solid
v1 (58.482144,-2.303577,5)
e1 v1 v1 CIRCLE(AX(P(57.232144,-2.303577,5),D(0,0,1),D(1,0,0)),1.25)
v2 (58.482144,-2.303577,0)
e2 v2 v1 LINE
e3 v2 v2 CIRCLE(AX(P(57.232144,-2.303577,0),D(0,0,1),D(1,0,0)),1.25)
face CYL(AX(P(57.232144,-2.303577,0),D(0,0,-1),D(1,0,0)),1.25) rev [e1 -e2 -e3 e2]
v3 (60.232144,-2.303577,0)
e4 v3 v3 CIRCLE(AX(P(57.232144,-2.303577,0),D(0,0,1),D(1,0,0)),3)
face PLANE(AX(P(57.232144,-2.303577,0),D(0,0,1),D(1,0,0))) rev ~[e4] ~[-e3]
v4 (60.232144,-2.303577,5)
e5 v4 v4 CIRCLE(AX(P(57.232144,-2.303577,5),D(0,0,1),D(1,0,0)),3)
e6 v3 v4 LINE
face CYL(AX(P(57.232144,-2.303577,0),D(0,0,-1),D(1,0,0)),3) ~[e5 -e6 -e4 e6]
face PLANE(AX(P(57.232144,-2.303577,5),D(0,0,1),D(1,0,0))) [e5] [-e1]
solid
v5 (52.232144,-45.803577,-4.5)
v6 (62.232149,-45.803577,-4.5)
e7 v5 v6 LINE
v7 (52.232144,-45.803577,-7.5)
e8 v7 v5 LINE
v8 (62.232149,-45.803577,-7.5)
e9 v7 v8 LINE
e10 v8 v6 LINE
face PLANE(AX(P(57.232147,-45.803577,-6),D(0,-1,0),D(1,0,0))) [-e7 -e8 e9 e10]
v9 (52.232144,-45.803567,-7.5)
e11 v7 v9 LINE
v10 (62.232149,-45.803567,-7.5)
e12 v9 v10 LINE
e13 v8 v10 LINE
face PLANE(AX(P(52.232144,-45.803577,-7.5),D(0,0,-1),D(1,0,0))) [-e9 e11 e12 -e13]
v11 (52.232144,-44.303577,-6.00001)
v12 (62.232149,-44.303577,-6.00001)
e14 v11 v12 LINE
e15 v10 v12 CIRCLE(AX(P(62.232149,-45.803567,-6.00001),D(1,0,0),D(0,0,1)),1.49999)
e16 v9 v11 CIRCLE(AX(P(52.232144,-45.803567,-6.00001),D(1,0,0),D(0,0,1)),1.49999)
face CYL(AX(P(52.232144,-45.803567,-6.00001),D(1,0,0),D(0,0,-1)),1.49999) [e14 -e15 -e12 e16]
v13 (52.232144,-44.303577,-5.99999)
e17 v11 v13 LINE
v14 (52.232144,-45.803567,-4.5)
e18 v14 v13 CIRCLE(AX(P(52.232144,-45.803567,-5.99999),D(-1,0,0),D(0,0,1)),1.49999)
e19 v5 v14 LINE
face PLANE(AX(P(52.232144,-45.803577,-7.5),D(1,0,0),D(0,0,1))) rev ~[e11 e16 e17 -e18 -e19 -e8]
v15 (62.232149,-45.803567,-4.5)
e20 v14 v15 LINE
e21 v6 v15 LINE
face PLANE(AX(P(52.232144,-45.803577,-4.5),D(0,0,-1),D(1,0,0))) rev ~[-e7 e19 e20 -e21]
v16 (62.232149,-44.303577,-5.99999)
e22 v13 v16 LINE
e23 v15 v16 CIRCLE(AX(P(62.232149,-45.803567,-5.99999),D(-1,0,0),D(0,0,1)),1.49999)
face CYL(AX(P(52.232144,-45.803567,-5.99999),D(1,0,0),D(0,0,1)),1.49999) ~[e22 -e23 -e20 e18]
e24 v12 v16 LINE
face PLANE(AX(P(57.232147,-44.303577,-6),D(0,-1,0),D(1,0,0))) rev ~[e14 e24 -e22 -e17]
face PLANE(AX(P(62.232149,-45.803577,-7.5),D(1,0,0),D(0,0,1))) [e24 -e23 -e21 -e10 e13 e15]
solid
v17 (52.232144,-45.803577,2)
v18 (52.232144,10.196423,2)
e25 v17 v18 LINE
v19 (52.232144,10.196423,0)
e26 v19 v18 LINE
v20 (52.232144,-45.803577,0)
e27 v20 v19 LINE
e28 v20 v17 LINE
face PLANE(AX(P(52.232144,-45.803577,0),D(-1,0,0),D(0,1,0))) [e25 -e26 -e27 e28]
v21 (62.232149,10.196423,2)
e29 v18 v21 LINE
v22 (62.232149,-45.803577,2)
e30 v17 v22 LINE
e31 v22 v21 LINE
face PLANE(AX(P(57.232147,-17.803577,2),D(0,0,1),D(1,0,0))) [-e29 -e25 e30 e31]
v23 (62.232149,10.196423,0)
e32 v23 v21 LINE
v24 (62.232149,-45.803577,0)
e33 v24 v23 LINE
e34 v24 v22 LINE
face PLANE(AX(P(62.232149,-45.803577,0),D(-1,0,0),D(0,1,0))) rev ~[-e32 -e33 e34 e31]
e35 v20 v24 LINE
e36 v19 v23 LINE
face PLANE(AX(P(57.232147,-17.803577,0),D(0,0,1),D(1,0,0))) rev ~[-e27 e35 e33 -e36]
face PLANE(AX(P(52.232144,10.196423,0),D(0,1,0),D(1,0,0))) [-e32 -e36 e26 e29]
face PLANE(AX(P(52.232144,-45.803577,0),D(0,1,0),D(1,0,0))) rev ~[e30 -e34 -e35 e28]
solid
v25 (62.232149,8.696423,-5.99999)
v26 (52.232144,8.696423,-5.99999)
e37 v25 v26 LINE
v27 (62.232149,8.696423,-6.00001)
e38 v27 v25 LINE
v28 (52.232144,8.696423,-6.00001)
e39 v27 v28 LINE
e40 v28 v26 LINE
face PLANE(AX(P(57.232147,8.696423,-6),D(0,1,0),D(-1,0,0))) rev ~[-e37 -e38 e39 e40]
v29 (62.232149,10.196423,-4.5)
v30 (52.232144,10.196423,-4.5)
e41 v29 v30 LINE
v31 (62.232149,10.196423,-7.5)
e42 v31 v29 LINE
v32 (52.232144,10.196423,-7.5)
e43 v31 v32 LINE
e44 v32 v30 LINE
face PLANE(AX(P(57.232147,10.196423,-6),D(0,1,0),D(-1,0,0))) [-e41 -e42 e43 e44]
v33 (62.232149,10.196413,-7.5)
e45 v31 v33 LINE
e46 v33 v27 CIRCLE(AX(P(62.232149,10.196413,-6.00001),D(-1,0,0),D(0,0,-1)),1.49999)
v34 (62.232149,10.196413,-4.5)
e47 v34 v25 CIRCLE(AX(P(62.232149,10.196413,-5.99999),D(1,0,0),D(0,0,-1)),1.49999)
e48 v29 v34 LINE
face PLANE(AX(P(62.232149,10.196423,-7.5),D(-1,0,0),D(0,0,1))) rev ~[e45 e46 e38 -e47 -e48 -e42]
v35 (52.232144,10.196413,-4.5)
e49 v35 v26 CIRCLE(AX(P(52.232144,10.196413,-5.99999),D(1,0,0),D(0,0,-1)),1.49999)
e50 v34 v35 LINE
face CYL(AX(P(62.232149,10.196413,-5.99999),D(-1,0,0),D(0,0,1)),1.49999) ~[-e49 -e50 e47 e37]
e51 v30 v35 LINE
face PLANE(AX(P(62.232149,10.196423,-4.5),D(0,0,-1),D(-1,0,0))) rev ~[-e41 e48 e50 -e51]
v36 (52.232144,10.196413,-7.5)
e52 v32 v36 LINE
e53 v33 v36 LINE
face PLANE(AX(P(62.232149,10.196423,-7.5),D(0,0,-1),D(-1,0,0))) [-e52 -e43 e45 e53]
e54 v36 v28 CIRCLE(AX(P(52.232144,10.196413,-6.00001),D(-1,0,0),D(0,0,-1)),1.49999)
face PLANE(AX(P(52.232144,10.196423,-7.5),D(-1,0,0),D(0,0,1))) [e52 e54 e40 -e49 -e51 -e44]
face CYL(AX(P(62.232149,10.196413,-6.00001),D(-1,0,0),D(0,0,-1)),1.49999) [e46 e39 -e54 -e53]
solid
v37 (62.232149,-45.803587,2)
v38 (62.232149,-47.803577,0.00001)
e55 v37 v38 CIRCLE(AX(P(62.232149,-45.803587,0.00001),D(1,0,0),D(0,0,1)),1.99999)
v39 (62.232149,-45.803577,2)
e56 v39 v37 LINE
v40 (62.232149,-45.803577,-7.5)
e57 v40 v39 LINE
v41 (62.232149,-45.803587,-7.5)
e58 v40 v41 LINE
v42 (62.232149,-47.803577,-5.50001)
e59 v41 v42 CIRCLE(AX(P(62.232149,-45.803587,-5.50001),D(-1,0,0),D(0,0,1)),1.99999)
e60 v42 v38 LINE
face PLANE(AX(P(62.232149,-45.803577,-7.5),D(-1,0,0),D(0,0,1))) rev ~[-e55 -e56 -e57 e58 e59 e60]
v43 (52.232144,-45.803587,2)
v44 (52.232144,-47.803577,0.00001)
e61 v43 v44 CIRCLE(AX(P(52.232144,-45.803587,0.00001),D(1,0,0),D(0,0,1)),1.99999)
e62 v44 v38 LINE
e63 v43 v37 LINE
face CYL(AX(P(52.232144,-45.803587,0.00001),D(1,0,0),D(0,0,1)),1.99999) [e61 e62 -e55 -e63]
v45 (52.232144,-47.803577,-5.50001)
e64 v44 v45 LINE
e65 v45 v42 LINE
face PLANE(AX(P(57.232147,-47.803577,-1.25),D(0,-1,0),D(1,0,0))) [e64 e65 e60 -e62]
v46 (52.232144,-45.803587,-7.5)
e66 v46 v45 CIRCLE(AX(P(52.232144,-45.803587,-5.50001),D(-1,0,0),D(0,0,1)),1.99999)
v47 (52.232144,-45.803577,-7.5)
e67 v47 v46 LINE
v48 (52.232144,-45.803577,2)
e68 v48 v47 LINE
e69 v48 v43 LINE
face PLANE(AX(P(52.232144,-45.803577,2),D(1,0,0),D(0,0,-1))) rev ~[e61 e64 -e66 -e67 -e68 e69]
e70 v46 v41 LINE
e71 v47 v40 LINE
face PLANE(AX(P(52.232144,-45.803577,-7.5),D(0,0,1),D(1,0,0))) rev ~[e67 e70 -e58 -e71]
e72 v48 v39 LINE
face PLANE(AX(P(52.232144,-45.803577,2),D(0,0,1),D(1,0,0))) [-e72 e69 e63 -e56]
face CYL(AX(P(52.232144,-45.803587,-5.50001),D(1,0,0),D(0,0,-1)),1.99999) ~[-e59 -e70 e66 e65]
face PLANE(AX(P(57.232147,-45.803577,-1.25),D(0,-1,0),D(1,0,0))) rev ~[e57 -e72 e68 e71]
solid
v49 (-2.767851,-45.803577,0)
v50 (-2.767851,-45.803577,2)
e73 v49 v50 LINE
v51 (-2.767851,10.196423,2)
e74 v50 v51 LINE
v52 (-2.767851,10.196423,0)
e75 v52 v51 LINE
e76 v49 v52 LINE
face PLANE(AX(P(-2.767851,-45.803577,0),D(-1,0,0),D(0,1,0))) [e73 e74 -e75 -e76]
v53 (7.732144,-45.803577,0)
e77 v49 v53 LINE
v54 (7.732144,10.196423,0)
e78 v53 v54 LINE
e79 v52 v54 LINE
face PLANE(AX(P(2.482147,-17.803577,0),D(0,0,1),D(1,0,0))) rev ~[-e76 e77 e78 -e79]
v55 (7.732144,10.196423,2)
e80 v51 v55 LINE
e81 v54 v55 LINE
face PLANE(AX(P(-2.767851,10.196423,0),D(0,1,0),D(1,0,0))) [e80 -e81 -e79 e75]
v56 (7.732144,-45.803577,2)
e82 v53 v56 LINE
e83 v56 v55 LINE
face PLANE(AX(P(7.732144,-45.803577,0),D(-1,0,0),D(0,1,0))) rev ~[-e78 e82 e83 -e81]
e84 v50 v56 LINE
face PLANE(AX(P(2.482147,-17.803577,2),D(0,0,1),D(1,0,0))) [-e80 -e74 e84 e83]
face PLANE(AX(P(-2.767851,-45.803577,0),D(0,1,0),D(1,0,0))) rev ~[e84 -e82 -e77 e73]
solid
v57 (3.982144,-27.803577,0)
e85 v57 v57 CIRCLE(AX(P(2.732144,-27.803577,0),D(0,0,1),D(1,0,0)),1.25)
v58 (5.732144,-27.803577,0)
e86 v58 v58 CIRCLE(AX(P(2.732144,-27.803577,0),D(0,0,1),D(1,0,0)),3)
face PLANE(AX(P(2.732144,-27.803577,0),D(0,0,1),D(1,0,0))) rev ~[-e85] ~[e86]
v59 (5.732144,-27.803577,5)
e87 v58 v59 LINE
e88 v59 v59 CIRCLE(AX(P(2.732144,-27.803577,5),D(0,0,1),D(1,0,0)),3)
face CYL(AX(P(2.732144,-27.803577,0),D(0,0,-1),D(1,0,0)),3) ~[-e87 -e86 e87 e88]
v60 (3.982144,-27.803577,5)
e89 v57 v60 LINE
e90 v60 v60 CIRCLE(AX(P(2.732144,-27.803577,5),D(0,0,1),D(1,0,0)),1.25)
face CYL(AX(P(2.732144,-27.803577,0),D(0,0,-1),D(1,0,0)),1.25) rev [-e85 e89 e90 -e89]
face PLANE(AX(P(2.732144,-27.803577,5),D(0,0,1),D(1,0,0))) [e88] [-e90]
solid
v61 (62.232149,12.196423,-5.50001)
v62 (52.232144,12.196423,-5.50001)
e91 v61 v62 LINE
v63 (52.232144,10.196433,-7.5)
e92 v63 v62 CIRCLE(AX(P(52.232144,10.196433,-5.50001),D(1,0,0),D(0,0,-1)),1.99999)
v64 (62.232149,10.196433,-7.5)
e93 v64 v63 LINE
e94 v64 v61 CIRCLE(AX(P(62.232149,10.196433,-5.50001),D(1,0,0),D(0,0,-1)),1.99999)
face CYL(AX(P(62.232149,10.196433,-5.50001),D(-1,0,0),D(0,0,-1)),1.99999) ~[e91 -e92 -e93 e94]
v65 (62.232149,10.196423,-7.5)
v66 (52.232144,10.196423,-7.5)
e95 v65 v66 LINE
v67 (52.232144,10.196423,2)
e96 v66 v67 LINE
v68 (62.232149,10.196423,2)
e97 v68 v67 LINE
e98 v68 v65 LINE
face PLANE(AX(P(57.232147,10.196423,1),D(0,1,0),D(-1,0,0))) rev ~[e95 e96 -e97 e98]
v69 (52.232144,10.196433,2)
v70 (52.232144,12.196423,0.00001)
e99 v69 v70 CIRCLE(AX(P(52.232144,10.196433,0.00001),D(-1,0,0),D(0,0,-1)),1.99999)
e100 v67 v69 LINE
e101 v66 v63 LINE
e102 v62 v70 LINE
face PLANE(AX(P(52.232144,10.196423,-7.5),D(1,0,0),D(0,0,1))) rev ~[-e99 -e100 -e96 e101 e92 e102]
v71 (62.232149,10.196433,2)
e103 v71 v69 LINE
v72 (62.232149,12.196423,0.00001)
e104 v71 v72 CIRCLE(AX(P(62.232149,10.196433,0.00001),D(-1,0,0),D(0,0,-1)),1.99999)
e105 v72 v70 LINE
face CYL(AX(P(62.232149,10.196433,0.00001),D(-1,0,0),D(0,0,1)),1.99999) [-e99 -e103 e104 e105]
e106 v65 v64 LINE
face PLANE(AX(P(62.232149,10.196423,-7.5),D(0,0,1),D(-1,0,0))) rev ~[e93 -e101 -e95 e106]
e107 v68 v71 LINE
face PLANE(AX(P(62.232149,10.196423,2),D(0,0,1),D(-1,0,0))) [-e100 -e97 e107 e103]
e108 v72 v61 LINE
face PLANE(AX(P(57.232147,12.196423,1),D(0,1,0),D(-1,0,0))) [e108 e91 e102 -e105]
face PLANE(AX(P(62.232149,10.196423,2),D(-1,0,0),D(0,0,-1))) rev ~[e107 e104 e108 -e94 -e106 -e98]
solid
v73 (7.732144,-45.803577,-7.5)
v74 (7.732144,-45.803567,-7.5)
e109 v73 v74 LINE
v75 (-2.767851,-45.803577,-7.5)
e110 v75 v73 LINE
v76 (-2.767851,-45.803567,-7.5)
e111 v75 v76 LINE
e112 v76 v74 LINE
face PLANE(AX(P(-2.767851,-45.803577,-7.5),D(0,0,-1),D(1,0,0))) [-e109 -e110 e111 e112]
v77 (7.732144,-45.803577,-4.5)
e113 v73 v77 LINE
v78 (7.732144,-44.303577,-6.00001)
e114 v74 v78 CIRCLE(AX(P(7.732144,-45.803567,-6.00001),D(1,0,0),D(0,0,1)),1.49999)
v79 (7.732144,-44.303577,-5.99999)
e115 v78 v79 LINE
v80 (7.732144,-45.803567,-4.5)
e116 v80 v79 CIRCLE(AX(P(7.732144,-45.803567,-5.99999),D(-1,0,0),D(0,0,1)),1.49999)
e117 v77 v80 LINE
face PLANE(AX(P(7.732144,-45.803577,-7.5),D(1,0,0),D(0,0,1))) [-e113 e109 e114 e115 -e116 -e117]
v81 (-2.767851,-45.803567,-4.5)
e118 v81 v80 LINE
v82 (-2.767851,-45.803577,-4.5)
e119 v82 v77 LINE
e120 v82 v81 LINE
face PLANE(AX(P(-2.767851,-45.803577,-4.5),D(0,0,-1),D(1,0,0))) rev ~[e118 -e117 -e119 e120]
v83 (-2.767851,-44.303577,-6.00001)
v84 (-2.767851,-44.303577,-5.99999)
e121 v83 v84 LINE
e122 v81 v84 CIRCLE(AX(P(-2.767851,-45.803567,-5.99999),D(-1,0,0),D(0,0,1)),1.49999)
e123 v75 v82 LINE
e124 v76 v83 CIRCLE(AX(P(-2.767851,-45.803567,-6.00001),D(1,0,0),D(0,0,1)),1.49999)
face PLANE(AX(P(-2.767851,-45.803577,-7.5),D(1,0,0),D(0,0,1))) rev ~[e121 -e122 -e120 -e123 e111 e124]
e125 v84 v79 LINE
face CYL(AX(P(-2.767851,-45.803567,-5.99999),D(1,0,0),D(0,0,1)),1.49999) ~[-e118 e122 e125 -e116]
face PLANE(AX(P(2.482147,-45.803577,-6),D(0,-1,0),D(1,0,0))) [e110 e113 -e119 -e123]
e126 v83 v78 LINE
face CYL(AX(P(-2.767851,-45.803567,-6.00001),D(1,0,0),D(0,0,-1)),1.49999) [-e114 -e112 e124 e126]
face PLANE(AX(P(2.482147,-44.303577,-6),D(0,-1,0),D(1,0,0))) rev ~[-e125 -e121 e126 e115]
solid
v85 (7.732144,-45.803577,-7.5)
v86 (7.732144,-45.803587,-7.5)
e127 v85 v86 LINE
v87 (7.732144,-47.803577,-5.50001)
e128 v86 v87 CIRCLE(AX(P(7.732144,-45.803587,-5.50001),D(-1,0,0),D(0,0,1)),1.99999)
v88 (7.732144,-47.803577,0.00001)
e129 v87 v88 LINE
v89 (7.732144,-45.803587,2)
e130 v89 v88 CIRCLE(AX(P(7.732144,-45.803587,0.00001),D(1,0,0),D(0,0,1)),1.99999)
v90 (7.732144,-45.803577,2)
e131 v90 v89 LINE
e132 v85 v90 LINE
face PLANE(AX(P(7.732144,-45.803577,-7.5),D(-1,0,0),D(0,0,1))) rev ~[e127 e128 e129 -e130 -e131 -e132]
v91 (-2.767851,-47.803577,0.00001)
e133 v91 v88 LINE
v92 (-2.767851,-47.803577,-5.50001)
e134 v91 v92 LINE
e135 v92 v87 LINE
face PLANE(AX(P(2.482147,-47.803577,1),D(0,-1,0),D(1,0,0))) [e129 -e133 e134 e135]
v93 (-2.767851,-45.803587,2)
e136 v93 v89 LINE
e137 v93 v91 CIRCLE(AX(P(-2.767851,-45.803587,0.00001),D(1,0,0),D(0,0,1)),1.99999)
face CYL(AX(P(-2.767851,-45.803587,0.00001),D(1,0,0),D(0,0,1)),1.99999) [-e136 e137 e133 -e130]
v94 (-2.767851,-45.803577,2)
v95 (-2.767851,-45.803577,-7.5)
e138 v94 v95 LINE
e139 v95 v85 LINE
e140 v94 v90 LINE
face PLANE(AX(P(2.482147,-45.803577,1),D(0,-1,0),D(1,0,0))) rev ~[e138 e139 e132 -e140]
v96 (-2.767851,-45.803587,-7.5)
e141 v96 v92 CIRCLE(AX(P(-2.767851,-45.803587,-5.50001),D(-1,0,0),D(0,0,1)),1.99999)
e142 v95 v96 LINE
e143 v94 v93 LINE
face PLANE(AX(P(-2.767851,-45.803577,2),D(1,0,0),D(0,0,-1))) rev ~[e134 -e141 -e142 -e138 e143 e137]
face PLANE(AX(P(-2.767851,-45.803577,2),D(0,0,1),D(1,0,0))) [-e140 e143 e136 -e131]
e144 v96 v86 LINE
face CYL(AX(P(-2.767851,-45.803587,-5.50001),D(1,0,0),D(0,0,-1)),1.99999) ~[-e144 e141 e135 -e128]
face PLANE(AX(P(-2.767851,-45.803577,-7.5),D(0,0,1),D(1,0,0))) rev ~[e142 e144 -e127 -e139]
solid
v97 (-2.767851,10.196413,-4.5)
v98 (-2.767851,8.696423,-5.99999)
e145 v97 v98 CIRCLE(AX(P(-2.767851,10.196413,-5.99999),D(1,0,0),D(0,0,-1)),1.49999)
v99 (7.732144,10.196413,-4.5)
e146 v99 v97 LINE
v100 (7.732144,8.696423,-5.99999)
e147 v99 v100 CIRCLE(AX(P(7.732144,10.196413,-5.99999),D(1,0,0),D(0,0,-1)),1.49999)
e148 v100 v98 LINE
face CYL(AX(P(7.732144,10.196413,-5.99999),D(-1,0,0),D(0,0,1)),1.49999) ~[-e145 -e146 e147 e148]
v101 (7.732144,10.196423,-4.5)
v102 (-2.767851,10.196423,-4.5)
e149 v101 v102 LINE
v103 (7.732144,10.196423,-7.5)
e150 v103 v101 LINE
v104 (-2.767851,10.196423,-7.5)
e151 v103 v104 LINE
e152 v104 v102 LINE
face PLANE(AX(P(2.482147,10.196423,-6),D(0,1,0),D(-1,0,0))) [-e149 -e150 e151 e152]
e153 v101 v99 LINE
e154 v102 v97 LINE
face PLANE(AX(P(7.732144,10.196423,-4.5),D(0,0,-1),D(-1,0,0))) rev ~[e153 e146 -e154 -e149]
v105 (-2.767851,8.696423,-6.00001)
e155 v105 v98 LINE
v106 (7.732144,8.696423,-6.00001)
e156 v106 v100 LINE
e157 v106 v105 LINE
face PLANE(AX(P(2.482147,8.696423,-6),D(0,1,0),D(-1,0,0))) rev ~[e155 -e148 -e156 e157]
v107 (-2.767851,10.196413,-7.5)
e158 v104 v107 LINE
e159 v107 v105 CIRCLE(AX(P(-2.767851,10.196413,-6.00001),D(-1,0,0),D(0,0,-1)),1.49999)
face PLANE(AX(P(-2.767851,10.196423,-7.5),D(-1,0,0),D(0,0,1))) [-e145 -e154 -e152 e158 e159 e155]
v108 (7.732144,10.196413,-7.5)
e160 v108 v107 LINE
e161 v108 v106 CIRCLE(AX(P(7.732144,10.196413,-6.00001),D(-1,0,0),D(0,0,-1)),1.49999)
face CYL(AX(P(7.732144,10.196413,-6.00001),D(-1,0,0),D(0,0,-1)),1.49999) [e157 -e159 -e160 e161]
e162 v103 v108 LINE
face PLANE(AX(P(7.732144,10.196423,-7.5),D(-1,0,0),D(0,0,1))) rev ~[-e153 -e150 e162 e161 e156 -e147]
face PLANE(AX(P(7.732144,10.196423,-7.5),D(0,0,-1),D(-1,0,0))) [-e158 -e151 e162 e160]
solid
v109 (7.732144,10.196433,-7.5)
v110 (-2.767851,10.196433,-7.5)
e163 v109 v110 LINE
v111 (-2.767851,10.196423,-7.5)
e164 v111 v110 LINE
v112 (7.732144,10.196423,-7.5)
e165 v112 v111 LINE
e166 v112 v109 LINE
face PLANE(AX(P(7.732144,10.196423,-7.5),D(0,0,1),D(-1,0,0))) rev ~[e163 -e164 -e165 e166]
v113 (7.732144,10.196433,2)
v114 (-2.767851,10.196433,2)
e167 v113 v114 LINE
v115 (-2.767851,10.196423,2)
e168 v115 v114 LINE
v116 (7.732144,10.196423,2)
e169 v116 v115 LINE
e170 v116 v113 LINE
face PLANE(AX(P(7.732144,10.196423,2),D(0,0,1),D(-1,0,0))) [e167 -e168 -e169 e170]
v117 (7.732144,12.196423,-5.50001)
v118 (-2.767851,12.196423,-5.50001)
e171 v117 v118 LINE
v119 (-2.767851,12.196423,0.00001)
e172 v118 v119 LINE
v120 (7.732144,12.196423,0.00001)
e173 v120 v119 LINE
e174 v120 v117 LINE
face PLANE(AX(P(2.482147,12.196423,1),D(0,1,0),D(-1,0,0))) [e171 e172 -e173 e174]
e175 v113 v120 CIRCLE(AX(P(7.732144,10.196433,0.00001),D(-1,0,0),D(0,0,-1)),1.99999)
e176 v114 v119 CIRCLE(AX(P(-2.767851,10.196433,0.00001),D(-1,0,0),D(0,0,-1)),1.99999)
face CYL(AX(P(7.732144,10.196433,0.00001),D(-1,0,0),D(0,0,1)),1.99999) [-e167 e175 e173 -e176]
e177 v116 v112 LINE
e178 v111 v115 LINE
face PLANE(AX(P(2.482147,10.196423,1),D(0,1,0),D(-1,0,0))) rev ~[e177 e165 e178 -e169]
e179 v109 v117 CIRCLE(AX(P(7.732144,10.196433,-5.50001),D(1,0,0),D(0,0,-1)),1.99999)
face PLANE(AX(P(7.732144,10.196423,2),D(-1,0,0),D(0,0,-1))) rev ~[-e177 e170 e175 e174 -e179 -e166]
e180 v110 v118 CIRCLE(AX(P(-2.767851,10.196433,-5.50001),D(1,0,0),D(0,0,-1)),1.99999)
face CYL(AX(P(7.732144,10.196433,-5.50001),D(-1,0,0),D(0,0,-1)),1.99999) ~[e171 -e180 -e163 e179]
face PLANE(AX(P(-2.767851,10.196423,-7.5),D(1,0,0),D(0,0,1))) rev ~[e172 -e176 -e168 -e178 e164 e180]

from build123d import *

# Parameters (mm, degrees)
F0_R     = 3
F0_R_2   = 1.25
F1_DEPTH = 5
F2_W     = 10.4999952316
F2_H     = 56
F3_DEPTH = 2
F2_W_2   = 10.0000047684
F4_W     = 10.4999952316
F4_H     = 2
F4_H_2   = 4.5
F4_H_3   = 3
F6_DEPTH = 2
F4_W_2   = 10.0000047684
F5_W     = 10.4999952316
F5_H     = 2
F5_H_2   = 4.5
F5_H_3   = 3
F7_DEPTH = 2
F5_W_2   = 10.0000047684
F5_H_4   = 6.5
F8_DEPTH = 1.5
F9_DEPTH = 1.5
F10_R    = 1.99999
F10_2_R  = 1.99999
F10_3_R  = 1.99999
F10_4_R  = 1.99999
F11_R    = 1.49999
F11_2_R  = 1.49999
F11_3_R  = 1.49999
F11_4_R  = 1.49999


# Not quite as in the source:
# - a fillet or chamfer is up to 0.001 mm smaller than in the source, because OpenCascade refuses the exact size


with BuildPart() as f1:
    # F0 (on Top) → F1 (new body)
    with BuildSketch(Plane.XY):
        with Locations((2.732144177, -27.8035767078)):
            Circle(F0_R)
        with Locations((2.732144177, -27.8035767078)):
            Circle(F0_R_2, mode=Mode.SUBTRACT)
    extrude(amount=F1_DEPTH)


with BuildPart() as f1b:
    # F0 (on Top) → F1, piece 2 (new body)
    with BuildSketch(Plane.XY):
        with Locations((57.232144177, -2.3035767078)):
            Circle(F0_R)
        with Locations((57.232144177, -2.3035767078)):
            Circle(F0_R_2, mode=Mode.SUBTRACT)
    extrude(amount=F1_DEPTH)


with BuildPart() as f3:
    # F2 (on Top) → F3 (new body)
    with BuildSketch(Plane.XY):
        with Locations((2.4821465611, -17.8035767078)):
            Rectangle(F2_W, F2_H)
    extrude(amount=F3_DEPTH)


with BuildPart() as f3b:
    # F2 (on Top) → F3, piece 2 (new body)
    with BuildSketch(Plane.XY):
        with Locations((57.2321465611, -17.8035767078)):
            Rectangle(F2_W_2, F2_H)
    extrude(amount=F3_DEPTH)


with BuildPart() as f6:
    # F4 (on face) → F6 (new body)
    with BuildSketch(Plane(origin=(0, 10.1964232922, 0), x_dir=(-1, 0, 0), z_dir=(0, 1, 0))):
        with Locations((-2.4821465611, 1)):
            Rectangle(F4_W, F4_H)
        with Locations((-2.4821465611, -2.25)):
            Rectangle(F4_W, F4_H_2)
        with Locations((-2.4821465611, -6)):
            Rectangle(F4_W, F4_H_3)
    extrude(amount=F6_DEPTH)

    # F10#3 (radius 2 in the source; OpenCascade refuses exactly that, so slightly less here)
    f10_3_edges = [f6.edges().sort_by_distance(p)[0] for p in [
        (2.482147, 12.196423, 2),
        (2.482147, 12.196423, -7.5),
    ]]
    fillet(f10_3_edges, radius=F10_3_R)


with BuildPart() as f6b:
    # F4 (on face) → F6, piece 2 (new body)
    with BuildSketch(Plane(origin=(0, 10.1964232922, 0), x_dir=(-1, 0, 0), z_dir=(0, 1, 0))):
        with Locations((-57.2321465611, 1)):
            Rectangle(F4_W_2, F4_H)
        with Locations((-57.2321465611, -2.25)):
            Rectangle(F4_W_2, F4_H_2)
        with Locations((-57.2321465611, -6)):
            Rectangle(F4_W_2, F4_H_3)
    extrude(amount=F6_DEPTH)

    # F10 (radius 2 in the source; OpenCascade refuses exactly that, so slightly less here)
    f10_edges = [f6b.edges().sort_by_distance(p)[0] for p in [
        (57.232147, 12.196423, 2),
        (57.232147, 12.196423, -7.5),
    ]]
    fillet(f10_edges, radius=F10_R)


with BuildPart() as f7:
    # F5 (on face) → F7 (new body)
    with BuildSketch(Plane.XZ.offset(45.8035767078)):
        with Locations((2.4821465611, 1)):
            Rectangle(F5_W, F5_H)
        with Locations((2.4821465611, -2.25)):
            Rectangle(F5_W, F5_H_2)
        with Locations((2.4821465611, -6)):
            Rectangle(F5_W, F5_H_3)
    extrude(amount=F7_DEPTH)

    # F10#4 (radius 2 in the source; OpenCascade refuses exactly that, so slightly less here)
    f10_4_edges = [f7.edges().sort_by_distance(p)[0] for p in [
        (2.482147, -47.803577, 2),
        (2.482147, -47.803577, -7.5),
    ]]
    fillet(f10_4_edges, radius=F10_4_R)


with BuildPart() as f7b:
    # F5 (on face) → F7, piece 2 (new body)
    with BuildSketch(Plane.XZ.offset(45.8035767078)):
        with Locations((57.2321465611, -1.25)):
            Rectangle(F5_W_2, F5_H_4)
        with Locations((57.2321465611, -6)):
            Rectangle(F5_W_2, F5_H_3)
    extrude(amount=F7_DEPTH)

    # F10#2 (radius 2 in the source; OpenCascade refuses exactly that, so slightly less here)
    f10_2_edges = [f7b.edges().sort_by_distance(p)[0] for p in [
        (57.232147, -47.803577, 2),
        (57.232147, -47.803577, -7.5),
    ]]
    fillet(f10_2_edges, radius=F10_2_R)


with BuildPart() as f8:
    # F4 (on face) → F8 (new body)
    with BuildSketch(Plane(origin=(0, 10.1964232922, 0), x_dir=(-1, 0, 0), z_dir=(0, 1, 0))):
        with Locations((-2.4821465611, -6)):
            Rectangle(F4_W, F4_H_3)
    extrude(amount=-F8_DEPTH)

    # F11#4 (radius 1.5 in the source; OpenCascade refuses exactly that, so slightly less here)
    f11_4_edges = [f8.edges().sort_by_distance(p)[0] for p in [
        (2.482147, 8.696423, -4.5),
        (2.482147, 8.696423, -7.5),
    ]]
    fillet(f11_4_edges, radius=F11_4_R)


with BuildPart() as f8b:
    # F4 (on face) → F8, piece 2 (new body)
    with BuildSketch(Plane(origin=(0, 10.1964232922, 0), x_dir=(-1, 0, 0), z_dir=(0, 1, 0))):
        with Locations((-57.2321465611, -6)):
            Rectangle(F4_W_2, F4_H_3)
    extrude(amount=-F8_DEPTH)

    # F11#3 (radius 1.5 in the source; OpenCascade refuses exactly that, so slightly less here)
    f11_3_edges = [f8b.edges().sort_by_distance(p)[0] for p in [
        (57.232147, 8.696423, -4.5),
        (57.232147, 8.696423, -7.5),
    ]]
    fillet(f11_3_edges, radius=F11_3_R)


with BuildPart() as f9:
    # F5 (on face) → F9 (new body)
    with BuildSketch(Plane.XZ.offset(45.8035767078)):
        with Locations((57.2321465611, -6)):
            Rectangle(F5_W_2, F5_H_3)
    extrude(amount=-F9_DEPTH)

    # F11#2 (radius 1.5 in the source; OpenCascade refuses exactly that, so slightly less here)
    f11_2_edges = [f9.edges().sort_by_distance(p)[0] for p in [
        (57.232147, -44.303577, -4.5),
        (57.232147, -44.303577, -7.5),
    ]]
    fillet(f11_2_edges, radius=F11_2_R)


with BuildPart() as f9b:
    # F5 (on face) → F9, piece 2 (new body)
    with BuildSketch(Plane.XZ.offset(45.8035767078)):
        with Locations((2.4821465611, -6)):
            Rectangle(F5_W, F5_H_3)
    extrude(amount=-F9_DEPTH)

    # F11 (radius 1.5 in the source; OpenCascade refuses exactly that, so slightly less here)
    f11_edges = [f9b.edges().sort_by_distance(p)[0] for p in [
        (2.482147, -44.303577, -7.5),
        (2.482147, -44.303577, -4.5),
    ]]
    fillet(f11_edges, radius=F11_R)


solid = Compound([f1.part, f1b.part, f3.part, f3b.part, f6.part, f6b.part, f7.part, f7b.part, f8.part, f8b.part, f9.part, f9b.part])
